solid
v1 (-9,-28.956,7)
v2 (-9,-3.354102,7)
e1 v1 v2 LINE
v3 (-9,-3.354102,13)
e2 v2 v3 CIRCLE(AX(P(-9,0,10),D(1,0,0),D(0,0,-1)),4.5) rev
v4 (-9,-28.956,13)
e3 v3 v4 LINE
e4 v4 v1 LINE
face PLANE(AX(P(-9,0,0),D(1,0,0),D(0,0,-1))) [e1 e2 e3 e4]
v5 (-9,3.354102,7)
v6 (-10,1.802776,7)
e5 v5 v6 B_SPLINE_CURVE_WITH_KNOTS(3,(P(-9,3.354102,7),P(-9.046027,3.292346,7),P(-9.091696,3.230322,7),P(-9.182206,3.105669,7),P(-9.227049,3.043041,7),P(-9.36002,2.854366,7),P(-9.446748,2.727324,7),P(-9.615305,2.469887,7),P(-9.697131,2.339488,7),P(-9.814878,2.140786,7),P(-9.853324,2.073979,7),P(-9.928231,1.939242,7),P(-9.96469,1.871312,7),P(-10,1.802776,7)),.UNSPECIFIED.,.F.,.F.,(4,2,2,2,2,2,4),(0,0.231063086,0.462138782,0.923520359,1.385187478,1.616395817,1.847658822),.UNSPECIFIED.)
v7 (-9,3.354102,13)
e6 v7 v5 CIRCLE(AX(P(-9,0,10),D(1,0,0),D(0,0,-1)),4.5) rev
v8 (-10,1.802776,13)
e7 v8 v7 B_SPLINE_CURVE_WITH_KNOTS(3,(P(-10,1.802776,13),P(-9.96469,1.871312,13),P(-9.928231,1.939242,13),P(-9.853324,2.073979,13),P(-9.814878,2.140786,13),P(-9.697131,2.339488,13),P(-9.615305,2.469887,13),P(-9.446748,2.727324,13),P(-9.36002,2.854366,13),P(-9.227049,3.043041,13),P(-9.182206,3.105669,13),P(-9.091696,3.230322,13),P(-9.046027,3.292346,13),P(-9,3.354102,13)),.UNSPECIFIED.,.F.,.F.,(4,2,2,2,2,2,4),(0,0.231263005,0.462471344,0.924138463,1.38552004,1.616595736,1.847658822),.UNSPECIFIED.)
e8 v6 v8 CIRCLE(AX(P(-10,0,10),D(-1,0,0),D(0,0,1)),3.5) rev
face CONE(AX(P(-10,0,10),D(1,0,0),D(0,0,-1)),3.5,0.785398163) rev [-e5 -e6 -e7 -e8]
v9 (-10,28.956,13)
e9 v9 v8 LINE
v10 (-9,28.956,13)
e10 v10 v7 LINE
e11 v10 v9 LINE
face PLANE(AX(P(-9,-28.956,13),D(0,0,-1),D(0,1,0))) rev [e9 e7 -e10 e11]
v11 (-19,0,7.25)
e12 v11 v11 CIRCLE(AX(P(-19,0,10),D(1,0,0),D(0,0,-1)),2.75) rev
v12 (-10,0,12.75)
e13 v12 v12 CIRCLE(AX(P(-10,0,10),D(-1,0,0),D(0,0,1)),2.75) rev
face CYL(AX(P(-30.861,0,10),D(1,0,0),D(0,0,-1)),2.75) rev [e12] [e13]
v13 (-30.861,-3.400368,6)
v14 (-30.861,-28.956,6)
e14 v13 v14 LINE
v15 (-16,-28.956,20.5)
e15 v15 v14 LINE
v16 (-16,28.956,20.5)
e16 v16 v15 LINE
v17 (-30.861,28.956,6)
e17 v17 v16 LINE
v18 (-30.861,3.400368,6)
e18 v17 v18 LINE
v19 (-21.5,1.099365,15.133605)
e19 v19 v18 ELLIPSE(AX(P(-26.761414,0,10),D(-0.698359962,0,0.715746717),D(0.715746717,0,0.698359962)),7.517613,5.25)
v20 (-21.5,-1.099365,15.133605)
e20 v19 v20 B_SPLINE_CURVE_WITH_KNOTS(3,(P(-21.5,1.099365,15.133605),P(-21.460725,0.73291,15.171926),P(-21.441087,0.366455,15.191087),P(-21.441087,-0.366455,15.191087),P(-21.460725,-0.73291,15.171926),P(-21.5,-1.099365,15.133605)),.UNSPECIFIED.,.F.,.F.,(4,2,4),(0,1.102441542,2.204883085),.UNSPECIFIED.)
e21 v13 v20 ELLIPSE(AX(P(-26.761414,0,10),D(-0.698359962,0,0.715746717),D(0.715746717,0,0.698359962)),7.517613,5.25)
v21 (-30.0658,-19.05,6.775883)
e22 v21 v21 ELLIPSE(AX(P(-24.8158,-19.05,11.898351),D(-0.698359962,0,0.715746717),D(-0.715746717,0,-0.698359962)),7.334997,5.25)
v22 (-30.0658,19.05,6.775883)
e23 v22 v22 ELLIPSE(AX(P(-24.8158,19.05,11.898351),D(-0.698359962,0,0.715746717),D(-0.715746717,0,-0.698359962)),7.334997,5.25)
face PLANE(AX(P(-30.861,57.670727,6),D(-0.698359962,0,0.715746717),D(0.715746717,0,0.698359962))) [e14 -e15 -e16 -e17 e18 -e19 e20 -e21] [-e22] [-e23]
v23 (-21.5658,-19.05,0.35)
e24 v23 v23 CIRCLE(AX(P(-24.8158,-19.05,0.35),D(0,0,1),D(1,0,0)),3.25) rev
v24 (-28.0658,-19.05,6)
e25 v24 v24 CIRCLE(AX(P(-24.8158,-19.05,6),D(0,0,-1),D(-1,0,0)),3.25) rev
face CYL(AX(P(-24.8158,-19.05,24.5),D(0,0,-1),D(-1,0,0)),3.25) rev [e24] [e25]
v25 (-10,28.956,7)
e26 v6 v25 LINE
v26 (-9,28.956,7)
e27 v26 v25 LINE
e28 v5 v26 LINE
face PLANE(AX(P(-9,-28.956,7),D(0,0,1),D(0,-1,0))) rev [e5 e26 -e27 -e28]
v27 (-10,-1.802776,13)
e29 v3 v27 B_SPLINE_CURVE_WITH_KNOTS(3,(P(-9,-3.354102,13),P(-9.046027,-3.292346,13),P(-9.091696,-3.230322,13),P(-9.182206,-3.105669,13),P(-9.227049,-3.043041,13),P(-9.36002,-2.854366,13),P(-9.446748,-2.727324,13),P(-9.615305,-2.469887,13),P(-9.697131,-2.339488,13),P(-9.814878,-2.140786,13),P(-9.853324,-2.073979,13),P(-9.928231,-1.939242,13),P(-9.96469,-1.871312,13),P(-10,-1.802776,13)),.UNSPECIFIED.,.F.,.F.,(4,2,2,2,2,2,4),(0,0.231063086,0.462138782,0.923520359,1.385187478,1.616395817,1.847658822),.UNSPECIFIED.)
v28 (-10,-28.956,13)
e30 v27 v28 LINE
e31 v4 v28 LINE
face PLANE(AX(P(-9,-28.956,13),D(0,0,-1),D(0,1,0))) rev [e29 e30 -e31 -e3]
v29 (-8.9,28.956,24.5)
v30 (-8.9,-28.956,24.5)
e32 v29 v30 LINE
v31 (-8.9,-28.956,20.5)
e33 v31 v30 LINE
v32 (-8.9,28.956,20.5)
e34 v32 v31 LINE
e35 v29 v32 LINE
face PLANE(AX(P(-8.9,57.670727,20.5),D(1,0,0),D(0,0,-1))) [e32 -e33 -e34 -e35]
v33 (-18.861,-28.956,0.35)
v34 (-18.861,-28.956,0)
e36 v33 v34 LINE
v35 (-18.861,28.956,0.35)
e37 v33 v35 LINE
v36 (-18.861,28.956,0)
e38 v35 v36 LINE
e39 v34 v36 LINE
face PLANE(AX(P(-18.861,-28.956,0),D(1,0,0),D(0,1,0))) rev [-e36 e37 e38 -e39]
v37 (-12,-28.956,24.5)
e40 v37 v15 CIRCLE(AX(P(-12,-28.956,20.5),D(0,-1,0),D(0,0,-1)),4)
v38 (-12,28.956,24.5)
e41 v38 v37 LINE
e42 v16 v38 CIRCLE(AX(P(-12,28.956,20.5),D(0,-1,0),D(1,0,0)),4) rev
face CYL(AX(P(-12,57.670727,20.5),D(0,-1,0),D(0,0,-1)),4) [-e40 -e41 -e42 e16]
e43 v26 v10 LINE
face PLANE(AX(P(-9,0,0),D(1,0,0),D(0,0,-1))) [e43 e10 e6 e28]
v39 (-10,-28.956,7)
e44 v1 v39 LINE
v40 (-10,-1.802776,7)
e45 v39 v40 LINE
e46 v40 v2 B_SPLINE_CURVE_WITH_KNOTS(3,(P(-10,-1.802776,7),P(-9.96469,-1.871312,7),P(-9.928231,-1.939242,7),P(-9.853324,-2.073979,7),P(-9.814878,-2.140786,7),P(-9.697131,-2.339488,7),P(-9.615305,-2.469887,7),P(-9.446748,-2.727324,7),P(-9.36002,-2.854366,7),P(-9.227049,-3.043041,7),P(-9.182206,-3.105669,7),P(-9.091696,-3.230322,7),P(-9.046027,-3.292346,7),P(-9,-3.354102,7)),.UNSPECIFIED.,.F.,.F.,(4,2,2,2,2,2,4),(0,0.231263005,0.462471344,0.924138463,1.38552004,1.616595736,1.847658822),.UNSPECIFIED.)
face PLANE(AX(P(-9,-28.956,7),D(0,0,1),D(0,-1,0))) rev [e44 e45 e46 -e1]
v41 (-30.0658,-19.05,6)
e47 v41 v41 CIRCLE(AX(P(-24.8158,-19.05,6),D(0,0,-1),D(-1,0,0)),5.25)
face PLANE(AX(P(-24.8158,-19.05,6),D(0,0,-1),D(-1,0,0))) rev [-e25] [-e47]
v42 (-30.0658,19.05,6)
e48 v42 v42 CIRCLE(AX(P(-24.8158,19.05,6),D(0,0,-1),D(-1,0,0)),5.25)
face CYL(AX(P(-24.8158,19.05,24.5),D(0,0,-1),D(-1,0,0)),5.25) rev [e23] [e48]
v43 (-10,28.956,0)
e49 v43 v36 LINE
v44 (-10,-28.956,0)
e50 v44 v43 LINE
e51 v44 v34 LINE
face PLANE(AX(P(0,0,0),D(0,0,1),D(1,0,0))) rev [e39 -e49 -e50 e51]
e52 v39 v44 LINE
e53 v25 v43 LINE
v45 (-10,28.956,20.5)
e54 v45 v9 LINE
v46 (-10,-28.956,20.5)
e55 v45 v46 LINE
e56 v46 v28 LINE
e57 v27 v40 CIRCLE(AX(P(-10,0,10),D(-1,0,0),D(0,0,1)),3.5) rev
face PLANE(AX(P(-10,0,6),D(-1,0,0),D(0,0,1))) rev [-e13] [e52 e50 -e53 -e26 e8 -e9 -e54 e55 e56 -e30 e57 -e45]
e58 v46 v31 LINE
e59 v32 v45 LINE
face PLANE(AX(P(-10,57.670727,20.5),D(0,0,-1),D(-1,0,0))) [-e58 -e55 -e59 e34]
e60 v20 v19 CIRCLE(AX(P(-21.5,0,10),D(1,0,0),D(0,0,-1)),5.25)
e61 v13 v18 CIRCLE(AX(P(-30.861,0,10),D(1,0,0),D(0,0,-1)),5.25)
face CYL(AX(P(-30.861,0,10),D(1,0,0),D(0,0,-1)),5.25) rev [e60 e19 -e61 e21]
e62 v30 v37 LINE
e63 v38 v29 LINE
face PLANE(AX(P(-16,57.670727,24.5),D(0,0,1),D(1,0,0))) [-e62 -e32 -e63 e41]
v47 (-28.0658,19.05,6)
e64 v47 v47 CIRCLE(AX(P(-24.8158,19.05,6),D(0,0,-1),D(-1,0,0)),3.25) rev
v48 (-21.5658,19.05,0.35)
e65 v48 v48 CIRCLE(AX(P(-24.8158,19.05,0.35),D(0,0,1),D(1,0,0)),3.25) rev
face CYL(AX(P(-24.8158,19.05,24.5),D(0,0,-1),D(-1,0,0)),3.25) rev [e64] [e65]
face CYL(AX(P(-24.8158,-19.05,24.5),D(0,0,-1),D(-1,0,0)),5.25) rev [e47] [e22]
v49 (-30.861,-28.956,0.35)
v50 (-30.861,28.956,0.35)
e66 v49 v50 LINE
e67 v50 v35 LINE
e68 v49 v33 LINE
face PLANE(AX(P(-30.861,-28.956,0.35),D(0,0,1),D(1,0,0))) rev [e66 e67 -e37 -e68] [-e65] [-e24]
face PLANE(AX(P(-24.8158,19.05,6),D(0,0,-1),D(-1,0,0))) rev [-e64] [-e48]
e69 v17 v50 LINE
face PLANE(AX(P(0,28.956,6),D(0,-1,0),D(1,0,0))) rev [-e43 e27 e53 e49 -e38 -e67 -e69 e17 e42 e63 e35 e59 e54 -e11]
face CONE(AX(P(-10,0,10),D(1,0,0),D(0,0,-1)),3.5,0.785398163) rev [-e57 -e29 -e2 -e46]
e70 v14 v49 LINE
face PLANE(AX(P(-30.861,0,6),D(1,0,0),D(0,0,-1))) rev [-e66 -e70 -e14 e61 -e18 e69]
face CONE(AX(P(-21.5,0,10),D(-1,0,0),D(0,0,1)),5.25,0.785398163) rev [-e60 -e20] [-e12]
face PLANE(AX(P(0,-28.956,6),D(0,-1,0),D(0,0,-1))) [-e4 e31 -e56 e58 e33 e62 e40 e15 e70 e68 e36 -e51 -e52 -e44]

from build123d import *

# Parameters (mm, degrees)
SKETCH1_W           = 20.861
SKETCH1_H           = 57.912
SKETCH1_R           = 3.25
BOSS_EXTRUDE1_DEPTH = 6
BOSS_EXTRUDE2_DEPTH = 57.912
SKETCH8_R           = 3.25
CUT_EXTRUDE4_DEPTH  = 49.898888096
CUT_EXTRUDE5_START  = -6
SKETCH9_R           = 5.25
CUT_EXTRUDE5_DEPTH  = 43.898888096
SKETCH10_R          = 2.75
CUT_EXTRUDE6_DEPTH  = 44.28835013
CUT_EXTRUDE7_START  = -9
SKETCH11_R          = 5.25
CUT_EXTRUDE7_DEPTH  = 35.28835013
SKETCH12_W          = 12
SKETCH12_H          = 0.35
CUT_EXTRUDE8_DEPTH  = 71.046063879
FILLET1_R           = 4
BOSS_EXTRUDE3_START = 1
SKETCH13_W          = 6
SKETCH13_H          = 57.912
SKETCH13_R          = 2.75
BOSS_EXTRUDE3_DEPTH = 1
CHAMFER1_SIZE       = 2.5
SKETCH14_R          = 3.5
CUT_EXTRUDE9_DEPTH  = 1
CHAMFER2_SIZE       = 1


# Some blends are built 0.0001 mm under size
with BuildPart() as part:
    # Sketch1 → Boss-Extrude1 (new body)
    # profile 1 of 3: a face of its own
    with BuildSketch(Plane.XY):
        with Locations((-20.4305, 0)):
            Rectangle(SKETCH1_W, SKETCH1_H)
        with Locations((-24.8158, 19.05)):
            Circle(SKETCH1_R, mode=Mode.SUBTRACT)
        with Locations((-24.8158, -19.05)):
            Circle(SKETCH1_R, mode=Mode.SUBTRACT)
    # profile 2 of 3: a face of its own
    with BuildSketch(Plane.XY):
        with Locations((-24.8158, 19.05)):
            Circle(SKETCH1_R)
    # profile 3 of 3: a face of its own
    with BuildSketch(Plane.XY):
        with Locations((-24.8158, -19.05)):
            Circle(SKETCH1_R)
    extrude(amount=BOSS_EXTRUDE1_DEPTH)

    # Sketch7 → Boss-Extrude2 (add)
    with BuildSketch(Plane.XZ.offset(28.956)):
        Polygon((-30.861, 6), (-16, 20.5), (-16, 24.5), (-8.9, 24.5), (-8.9, 20.5), (-10, 20.5), (-10, 6), align=None)
    extrude(amount=-BOSS_EXTRUDE2_DEPTH)

    # Sketch8 → Cut-Extrude4 (cut, through all)
    with BuildSketch(Plane(origin=(0, 0, 0), x_dir=(-1, 0, 0), z_dir=(0, 0, -1))):
        with Locations((24.8158, -19.05)):
            Circle(SKETCH8_R)
        with Locations((24.8158, 19.05)):
            Circle(SKETCH8_R)
    extrude(amount=-CUT_EXTRUDE4_DEPTH, mode=Mode.SUBTRACT)

    # Sketch9 → Cut-Extrude5 (cut, through all)
    with BuildSketch(Plane(origin=(0, 0, 0), x_dir=(-1, 0, 0), z_dir=(0, 0, -1)).offset(CUT_EXTRUDE5_START)):
        with Locations((24.8158, -19.05)):
            Circle(SKETCH9_R)
        with Locations((24.8158, 19.05)):
            Circle(SKETCH9_R)
    extrude(amount=-CUT_EXTRUDE5_DEPTH, mode=Mode.SUBTRACT)

    # Sketch10 → Cut-Extrude6 (cut, through all)
    with BuildSketch(Plane(origin=(-10, 0, 0), x_dir=(0, 0, -1), z_dir=(1, 0, 0))):
        with Locations((-10, 0)):
            Circle(SKETCH10_R)
    extrude(amount=-CUT_EXTRUDE6_DEPTH, mode=Mode.SUBTRACT)

    # Sketch11 → Cut-Extrude7 (cut, through all)
    with BuildSketch(Plane(origin=(-10, 0, 0), x_dir=(0, 0, -1), z_dir=(1, 0, 0)).offset(CUT_EXTRUDE7_START)):
        with Locations((-10, 0)):
            Circle(SKETCH11_R)
    extrude(amount=-CUT_EXTRUDE7_DEPTH, mode=Mode.SUBTRACT)

    # Sketch12 → Cut-Extrude8 (cut, through all)
    with BuildSketch(Plane(origin=(0, 28.956, 0), x_dir=(1, 0, 0), z_dir=(0, 1, 0))):
        with Locations((-24.861, -0.175)):
            Rectangle(SKETCH12_W, SKETCH12_H)
    extrude(amount=-CUT_EXTRUDE8_DEPTH, mode=Mode.SUBTRACT)

    # Fillet1
    fillet1_edges = [part.edges().sort_by_distance(p)[0] for p in [
        (-16, 0, 24.5),
    ]]
    fillet(fillet1_edges, radius=FILLET1_R - 0.0001)  # a hair under: the kernel refuses the full size

    # Sketch13 → Boss-Extrude3 (add)
    with BuildSketch(Plane(origin=(-10, 0, 0), x_dir=(0, 0, -1), z_dir=(1, 0, 0)).offset(BOSS_EXTRUDE3_START)):
        with Locations((-10, 0)):
            Rectangle(SKETCH13_W, SKETCH13_H)
        with Locations((-10, 0)):
            Circle(SKETCH13_R, mode=Mode.SUBTRACT)
    extrude(amount=-BOSS_EXTRUDE3_DEPTH)

    # Chamfer1
    # the kernel refuses this chamfer: 2.5 mm, written as the material it adds along each edge
    with BuildSketch(Plane(origin=(-19, 0, 10), x_dir=(0, 0, -1), z_dir=(0, -1, 0))) as chamfer1_piece_1_section:
        Polygon((5.25 - CHAMFER1_SIZE, 0), (5.25, -CHAMFER1_SIZE), (5.25, 0), align=None)
    chamfer1_piece_1 = revolve(axis=Axis((-19, 0, 10), (1, 0, 0)), mode=Mode.PRIVATE)
    chamfer1_piece_1 = chamfer1_piece_1 - Plane(origin=(-20.253037954, 0, 10), x_dir=(0, 0, -1), z_dir=(1, 0, 0)) * Cylinder(2.75, 21, mode=Mode.PRIVATE)
    chamfer1_piece_1 = split(chamfer1_piece_1, bisect_by=Plane(origin=(-21.393994511, 0, 15.237035166), z_dir=(0.6983599622441906, 0, -0.7157467171662703)), keep=Keep.TOP, mode=Mode.PRIVATE)
    add(chamfer1_piece_1)

    # Sketch14 → Cut-Extrude9 (cut)
    with BuildSketch(Plane(origin=(-9, 0, 0), x_dir=(0, 0, -1), z_dir=(1, 0, 0))):
        with Locations((-10, 0)):
            Circle(SKETCH14_R)
    extrude(amount=-CUT_EXTRUDE9_DEPTH, mode=Mode.SUBTRACT)

    # Chamfer2
    chamfer2_edges = [part.edges().sort_by_distance(p)[0] for p in [
        (-9, -3.5, 10),
        (-9, 3.5, 10),
    ]]
    chamfer(chamfer2_edges, length=CHAMFER2_SIZE - 0.0001)  # a hair under: the kernel refuses the full size


solid = part.part
